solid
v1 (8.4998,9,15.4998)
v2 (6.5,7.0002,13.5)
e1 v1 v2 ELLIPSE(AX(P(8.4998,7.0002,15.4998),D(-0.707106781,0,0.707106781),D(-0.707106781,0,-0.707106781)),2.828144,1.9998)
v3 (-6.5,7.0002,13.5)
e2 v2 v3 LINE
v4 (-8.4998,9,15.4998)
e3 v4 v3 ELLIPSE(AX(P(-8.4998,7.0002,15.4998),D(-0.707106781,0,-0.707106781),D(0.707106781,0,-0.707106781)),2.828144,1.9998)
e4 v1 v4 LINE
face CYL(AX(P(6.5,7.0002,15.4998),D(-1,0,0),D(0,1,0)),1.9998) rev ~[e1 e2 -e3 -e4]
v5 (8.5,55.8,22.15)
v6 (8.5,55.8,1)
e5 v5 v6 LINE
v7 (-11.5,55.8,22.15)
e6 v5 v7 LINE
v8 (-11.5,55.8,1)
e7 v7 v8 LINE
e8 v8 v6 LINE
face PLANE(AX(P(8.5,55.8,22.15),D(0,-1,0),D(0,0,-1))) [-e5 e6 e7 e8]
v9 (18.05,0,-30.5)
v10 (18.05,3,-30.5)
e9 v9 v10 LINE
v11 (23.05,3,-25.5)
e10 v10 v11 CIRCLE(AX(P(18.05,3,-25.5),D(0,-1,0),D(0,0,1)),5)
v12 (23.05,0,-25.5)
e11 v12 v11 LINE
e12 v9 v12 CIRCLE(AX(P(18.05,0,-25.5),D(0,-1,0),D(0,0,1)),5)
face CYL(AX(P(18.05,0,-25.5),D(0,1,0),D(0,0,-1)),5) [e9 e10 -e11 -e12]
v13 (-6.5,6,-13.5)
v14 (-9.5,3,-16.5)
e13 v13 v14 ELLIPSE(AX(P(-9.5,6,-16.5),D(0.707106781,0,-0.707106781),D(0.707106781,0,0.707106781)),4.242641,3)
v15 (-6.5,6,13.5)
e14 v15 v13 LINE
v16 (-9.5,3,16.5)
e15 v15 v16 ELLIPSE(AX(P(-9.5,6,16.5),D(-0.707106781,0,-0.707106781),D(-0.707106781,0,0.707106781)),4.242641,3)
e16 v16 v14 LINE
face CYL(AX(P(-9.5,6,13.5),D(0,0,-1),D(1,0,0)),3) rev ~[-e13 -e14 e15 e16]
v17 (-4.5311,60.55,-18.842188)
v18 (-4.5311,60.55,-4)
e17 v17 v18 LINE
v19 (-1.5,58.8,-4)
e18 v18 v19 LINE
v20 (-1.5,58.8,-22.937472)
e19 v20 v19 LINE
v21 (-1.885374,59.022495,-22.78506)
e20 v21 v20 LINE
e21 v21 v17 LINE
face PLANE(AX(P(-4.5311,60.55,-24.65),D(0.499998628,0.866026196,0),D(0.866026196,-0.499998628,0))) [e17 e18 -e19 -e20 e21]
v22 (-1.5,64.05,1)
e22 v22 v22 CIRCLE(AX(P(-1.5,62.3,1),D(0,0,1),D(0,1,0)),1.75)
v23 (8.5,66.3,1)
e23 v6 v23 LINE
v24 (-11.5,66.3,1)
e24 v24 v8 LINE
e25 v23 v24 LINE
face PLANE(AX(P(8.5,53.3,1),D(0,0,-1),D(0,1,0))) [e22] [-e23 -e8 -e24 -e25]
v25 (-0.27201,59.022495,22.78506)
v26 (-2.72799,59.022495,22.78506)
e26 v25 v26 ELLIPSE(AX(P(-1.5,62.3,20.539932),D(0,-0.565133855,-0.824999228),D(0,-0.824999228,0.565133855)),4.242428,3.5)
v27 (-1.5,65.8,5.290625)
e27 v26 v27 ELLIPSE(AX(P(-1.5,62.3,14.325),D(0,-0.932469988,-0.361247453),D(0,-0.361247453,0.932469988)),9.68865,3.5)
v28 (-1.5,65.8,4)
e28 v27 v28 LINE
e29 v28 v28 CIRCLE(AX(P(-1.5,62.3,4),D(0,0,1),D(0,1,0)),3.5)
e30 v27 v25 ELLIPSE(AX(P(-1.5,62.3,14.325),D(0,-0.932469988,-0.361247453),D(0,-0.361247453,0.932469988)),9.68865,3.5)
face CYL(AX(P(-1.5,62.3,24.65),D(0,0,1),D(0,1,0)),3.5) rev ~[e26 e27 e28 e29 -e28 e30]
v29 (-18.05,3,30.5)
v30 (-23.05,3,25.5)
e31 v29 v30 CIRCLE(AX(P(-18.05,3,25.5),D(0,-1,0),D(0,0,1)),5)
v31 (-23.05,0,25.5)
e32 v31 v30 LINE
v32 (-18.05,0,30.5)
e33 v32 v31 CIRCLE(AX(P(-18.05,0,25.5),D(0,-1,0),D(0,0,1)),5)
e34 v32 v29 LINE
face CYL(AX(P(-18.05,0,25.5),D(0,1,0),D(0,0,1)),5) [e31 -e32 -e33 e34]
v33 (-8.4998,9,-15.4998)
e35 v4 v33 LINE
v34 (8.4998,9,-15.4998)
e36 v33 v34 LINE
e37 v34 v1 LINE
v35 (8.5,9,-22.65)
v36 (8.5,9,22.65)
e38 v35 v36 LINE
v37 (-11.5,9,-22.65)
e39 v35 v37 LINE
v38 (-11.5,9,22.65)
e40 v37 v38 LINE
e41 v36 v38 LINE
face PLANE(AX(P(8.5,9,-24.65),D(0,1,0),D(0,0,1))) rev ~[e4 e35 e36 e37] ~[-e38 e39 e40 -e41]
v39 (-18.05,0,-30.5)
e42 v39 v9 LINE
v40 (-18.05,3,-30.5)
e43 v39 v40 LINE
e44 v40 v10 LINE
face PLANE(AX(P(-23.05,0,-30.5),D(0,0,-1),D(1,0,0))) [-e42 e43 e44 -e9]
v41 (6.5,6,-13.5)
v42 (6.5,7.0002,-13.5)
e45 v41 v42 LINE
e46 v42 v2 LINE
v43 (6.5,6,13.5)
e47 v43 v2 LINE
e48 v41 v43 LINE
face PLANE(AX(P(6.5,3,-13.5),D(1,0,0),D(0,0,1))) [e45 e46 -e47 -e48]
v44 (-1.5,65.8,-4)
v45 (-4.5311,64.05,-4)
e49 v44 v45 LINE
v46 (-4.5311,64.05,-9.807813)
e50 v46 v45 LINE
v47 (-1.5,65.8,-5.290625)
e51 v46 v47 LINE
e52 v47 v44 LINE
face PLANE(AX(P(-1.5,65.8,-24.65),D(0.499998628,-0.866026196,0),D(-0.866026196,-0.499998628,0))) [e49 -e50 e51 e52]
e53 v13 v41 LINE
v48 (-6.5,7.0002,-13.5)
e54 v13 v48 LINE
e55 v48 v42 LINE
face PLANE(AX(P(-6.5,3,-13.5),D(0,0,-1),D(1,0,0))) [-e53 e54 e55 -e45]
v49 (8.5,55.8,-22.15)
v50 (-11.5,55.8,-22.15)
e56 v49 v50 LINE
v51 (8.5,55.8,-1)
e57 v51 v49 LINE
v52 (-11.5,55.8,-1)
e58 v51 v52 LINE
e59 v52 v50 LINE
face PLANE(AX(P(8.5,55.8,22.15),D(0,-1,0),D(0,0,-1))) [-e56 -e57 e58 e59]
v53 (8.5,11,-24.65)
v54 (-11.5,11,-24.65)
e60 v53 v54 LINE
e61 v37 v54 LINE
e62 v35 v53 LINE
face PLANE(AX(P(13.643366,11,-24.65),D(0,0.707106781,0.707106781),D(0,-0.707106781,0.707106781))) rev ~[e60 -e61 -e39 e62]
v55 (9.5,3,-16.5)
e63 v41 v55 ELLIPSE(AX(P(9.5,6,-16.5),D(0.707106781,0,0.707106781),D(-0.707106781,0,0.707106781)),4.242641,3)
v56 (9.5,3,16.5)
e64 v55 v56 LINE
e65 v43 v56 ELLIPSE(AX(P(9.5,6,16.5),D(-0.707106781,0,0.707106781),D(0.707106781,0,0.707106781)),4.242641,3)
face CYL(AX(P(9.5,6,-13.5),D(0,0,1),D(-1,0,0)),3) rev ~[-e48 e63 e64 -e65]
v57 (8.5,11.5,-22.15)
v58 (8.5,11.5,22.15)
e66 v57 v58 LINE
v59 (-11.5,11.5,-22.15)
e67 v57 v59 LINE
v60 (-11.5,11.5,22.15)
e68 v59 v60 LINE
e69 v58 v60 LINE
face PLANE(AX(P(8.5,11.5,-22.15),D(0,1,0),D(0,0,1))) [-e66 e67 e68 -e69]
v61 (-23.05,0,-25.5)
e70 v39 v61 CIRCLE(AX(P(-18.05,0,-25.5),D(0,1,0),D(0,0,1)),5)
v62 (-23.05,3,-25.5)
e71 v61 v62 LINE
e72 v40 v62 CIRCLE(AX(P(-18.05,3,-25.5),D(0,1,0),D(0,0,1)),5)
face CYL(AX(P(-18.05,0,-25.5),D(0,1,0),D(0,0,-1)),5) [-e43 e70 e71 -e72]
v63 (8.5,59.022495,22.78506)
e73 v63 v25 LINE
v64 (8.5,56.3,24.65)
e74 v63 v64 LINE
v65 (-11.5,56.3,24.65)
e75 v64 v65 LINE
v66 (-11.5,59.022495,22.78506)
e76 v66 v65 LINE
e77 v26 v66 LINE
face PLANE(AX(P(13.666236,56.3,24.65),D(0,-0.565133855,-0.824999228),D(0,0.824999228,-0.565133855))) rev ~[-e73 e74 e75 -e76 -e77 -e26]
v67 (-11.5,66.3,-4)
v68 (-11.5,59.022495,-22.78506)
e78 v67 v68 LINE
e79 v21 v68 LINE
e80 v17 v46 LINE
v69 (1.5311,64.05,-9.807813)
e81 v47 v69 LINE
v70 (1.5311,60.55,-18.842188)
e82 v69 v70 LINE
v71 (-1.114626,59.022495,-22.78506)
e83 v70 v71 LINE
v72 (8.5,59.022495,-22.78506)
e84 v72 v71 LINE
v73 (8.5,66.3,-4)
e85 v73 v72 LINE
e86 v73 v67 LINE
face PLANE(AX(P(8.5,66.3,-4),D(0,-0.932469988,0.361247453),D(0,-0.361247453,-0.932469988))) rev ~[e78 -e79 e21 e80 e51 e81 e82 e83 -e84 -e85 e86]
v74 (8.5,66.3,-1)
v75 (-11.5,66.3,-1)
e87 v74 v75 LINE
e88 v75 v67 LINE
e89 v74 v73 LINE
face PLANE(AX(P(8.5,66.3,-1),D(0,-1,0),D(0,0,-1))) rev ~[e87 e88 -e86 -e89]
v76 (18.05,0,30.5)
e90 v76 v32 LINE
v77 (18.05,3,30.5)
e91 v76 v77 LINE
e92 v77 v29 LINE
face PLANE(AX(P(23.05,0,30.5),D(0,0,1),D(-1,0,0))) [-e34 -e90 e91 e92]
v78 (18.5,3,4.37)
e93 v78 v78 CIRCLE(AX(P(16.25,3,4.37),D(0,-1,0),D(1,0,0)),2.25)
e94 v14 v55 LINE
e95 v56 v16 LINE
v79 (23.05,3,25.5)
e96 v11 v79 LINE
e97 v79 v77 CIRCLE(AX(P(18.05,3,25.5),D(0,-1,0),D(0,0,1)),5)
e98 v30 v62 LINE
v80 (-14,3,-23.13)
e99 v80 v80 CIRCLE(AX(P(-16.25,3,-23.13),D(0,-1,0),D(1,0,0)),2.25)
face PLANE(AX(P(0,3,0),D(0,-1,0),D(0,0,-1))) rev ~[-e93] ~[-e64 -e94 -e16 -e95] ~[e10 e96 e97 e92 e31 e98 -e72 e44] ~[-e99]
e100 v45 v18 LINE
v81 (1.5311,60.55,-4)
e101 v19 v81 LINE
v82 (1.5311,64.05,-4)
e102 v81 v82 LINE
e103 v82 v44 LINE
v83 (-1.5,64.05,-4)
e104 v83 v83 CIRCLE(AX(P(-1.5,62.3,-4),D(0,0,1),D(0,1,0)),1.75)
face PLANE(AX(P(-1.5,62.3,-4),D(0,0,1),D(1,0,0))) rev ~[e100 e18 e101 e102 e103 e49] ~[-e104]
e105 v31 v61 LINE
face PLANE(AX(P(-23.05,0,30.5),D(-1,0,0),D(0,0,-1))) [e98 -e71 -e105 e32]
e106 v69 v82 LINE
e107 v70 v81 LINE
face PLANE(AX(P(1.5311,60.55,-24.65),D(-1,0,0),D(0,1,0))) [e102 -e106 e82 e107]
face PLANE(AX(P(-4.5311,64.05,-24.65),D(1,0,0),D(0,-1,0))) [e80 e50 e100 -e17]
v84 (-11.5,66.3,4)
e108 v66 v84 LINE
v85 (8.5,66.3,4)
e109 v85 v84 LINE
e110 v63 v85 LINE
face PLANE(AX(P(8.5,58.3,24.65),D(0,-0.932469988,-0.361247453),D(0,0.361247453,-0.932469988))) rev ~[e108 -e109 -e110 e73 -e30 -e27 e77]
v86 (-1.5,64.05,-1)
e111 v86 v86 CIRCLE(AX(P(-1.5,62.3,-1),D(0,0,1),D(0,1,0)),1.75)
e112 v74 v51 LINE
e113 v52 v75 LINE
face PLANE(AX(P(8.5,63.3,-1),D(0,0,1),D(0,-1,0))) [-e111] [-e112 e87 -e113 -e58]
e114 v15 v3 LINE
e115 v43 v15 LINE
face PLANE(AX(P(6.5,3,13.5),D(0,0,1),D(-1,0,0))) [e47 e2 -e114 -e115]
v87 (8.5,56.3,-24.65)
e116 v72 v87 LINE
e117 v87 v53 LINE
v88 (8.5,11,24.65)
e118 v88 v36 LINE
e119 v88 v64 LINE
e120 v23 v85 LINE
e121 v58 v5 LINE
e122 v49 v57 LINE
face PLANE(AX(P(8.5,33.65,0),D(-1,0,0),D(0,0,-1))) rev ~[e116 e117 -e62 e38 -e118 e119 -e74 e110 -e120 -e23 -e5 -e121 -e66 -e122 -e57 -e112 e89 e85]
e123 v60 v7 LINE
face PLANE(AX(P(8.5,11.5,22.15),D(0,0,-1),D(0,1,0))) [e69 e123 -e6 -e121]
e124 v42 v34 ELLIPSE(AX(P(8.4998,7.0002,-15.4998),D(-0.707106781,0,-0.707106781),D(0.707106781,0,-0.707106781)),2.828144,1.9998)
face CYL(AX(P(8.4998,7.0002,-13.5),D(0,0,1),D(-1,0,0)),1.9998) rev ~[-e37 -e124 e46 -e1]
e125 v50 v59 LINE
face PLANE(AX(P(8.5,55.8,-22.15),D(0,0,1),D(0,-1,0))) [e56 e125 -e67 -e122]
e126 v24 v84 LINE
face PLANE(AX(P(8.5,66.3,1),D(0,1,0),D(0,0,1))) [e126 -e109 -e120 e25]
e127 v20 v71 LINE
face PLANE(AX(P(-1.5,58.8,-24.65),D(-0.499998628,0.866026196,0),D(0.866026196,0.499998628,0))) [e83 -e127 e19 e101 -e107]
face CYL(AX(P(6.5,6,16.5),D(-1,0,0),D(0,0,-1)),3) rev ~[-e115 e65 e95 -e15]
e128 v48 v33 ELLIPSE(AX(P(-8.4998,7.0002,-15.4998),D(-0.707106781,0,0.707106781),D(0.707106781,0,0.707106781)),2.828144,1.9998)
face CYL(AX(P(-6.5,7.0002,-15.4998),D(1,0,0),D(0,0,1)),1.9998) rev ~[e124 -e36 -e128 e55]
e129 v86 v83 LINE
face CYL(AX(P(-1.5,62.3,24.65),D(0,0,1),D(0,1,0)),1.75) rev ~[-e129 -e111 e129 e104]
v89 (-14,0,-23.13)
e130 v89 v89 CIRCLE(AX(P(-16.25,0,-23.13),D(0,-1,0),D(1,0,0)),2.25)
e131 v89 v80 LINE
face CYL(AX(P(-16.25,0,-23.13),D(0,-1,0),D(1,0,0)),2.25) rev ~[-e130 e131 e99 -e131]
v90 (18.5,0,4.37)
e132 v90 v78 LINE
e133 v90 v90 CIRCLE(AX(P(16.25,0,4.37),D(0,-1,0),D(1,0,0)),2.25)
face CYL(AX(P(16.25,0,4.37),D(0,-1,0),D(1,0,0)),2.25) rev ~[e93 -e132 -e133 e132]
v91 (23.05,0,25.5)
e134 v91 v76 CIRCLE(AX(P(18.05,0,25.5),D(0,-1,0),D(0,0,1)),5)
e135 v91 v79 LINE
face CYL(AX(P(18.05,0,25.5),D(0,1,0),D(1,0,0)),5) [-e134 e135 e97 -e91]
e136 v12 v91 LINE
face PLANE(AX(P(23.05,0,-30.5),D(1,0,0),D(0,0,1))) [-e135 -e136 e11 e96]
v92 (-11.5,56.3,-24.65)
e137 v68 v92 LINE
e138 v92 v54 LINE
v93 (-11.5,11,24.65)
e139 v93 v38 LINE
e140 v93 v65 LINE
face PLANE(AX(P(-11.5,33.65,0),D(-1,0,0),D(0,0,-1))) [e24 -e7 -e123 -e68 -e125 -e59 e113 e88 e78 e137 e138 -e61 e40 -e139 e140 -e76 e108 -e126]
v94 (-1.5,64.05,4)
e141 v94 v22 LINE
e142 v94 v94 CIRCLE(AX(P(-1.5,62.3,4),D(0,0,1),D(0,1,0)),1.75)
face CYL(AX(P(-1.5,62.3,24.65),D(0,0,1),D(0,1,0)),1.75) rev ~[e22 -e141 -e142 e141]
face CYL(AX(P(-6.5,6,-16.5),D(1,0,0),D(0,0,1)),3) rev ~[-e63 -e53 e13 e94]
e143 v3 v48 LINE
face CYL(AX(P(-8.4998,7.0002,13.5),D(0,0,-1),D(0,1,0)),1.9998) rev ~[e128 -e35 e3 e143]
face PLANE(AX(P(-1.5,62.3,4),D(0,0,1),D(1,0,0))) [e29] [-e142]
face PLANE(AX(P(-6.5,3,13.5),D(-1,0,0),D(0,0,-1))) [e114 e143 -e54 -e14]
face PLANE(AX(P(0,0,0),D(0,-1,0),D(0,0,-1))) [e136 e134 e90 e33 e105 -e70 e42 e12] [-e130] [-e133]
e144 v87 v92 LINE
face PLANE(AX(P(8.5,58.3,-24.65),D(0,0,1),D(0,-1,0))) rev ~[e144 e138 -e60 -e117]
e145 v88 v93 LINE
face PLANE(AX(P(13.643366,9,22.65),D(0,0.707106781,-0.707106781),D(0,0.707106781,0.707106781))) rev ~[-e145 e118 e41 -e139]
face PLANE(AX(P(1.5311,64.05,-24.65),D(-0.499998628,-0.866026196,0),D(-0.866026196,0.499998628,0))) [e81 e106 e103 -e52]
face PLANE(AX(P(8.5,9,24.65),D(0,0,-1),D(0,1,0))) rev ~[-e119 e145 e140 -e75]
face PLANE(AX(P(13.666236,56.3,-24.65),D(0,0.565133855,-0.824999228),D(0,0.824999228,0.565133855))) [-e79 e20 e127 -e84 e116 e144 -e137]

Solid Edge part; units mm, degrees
sketch "Sketch1" plane through (0, 0, 0) normal (0, -1, 0) x (1, 0, 0)
  circle A0 centre (16.25, 4.37) radius 2.25
  circle A1 centre (-16.25, -23.13) radius 2.25
  line L0 (-23.05, -30.5) -> (23.05, -30.5)
  line L1 (23.05, -30.5) -> (23.05, 30.5)
  line L2 (23.05, 30.5) -> (-23.05, 30.5)
  line L3 (-23.05, 30.5) -> (-23.05, -30.5)
  dimension "D1" = 61
  dimension "D2" = 4.5
  dimension "D3" = 27.5
  dimension "D4" = 32.5
  dimension "D5" = 26.13
  dimension "D6" = 6.8
  dimension "D7" = 6.8
extrude "Protrusion1" add sketch "Sketch1" against normal blind 3
fillet "Redondeo_2" radius 5 4 edges at (23.05, 1.5, 30.5) (-23.05, 1.5, 30.5) (23.05, 1.5, -30.5) (-23.05, 1.5, -30.5)
sketch "Sketch2" plane through (0, 3, 0) normal (0, 1, 0) x (-1, 0, 0)
  line L0 (-6.5, 13.5) -> (6.5, 13.5)
  line L1 (6.5, 13.5) -> (6.5, -13.5)
  line L2 (6.5, -13.5) -> (-6.5, -13.5)
  line L3 (-6.5, -13.5) -> (-6.5, 13.5)
extrude "ProtrusiónExtruida_4" add sketch "Sketch2" along normal blind 6
sketch "Sketch3" plane through (8.5, 6, 0) normal (1, 0, 0) x (0, 1, 0)
  line L0 (49.8, -22.15) -> (5.5, -22.15)
  line L1 (5.5, -22.15) -> (5.5, 22.15)
  line L2 (5.5, 22.15) -> (49.8, 22.15)
  line L3 (49.8, 22.15) -> (49.8, -22.15)
  line L4 (52.3, -24.65) -> (3, -24.65)
  line L5 (3, -24.65) -> (3, 24.65)
  line L6 (3, 24.65) -> (52.3, 24.65)
  line L7 (52.3, 24.65) -> (52.3, -24.65)
  dimension "D1" = 2.5
  dimension "D2" = 2.5
  dimension "D3" = 2.5
  dimension "D4" = 44.3
  dimension "D5" = 22.15
extrude "ProtrusiónExtruida_5" add sketch "Sketch3" against normal blind 20
sketch "Sketch4" plane through (8.5, 33.65, 0) normal (1, 0, 0) x (0, 1, 0)
  line L0 (29.65, -1) -> (19.65, -1)
  line L1 (19.65, -1) -> (19.65, 1)
  line L2 (19.65, 1) -> (29.65, 1)
  line L3 (29.65, 1) -> (29.65, -1)
  dimension "D1" = 2
  dimension "D2" = 10
extrude "VaciadoExtruido_1" cut sketch "Sketch4" against normal blind 43.1103
sketch "Sketch5" plane through (8.5, 33.65, 0) normal (1, 0, 0) x (0, 1, 0)
  line L0 (24.65, -24.65) -> (24.65, -1)
  line L1 (24.65, -1) -> (32.65, -1)
  line L2 (32.65, -1) -> (32.65, -4)
  line L3 (32.65, -4) -> (24.65, -24.65)
  line L4 (24.65, 1) -> (32.65, 1)
  line L5 (32.65, 1) -> (32.65, 4)
  line L6 (24.65, 24.65) -> (32.65, 4)
  line L7 (24.65, 24.65) -> (24.65, 1)
  dimension "D1" = 8
  dimension "D2" = 3
extrude "v_20" add sketch "Sketch5" against normal blind 20
sketch "Sketch6" plane through (-1.5, 33.65, 24.65) normal (0, 0, 1) x (0, 1, 0)
  circle A0 centre (28.65, 0) radius 1.75
  dimension "D1" = 10
  dimension "D2" = 4
extrude "VaciadoExtruido_2" cut sketch "Sketch6" against normal blind 71.0094
sketch "Sketch7" plane through (-1.5, 33.65, 24.65) normal (0, 0, 1) x (0, 1, 0)
  circle A0 centre (28.65, 0) radius 3.5
extrude "Cutout1" cut sketch "Sketch7" against normal up to vertex (20.65 mm away)
chamfer "Chaflán_2" distance 2 angle 45 4 edges at (-1.5, 58.3, 24.65) (-1.5, 9, 24.65) (-1.5, 58.3, -24.65) (-1.5, 9, -24.65)
sketch "Sketch8" plane through (-1.5, 33.65, -24.65) normal (0, 0, -1) x (0, -1, 0)
  line L0 (-32.15, 0) -> (-30.4, 3.0311)
  line L1 (-30.4, 3.0311) -> (-26.9, 3.0311)
  line L2 (-26.9, 3.0311) -> (-25.15, 0)
  line L3 (-25.15, 0) -> (-26.9, -3.0311)
  line L4 (-26.9, -3.0311) -> (-30.4, -3.0311)
  line L5 (-30.4, -3.0311) -> (-32.15, 0)
  dimension "D1" = 7
extrude "Cutout2" cut sketch "Sketch8" against normal up to vertex (20.65 mm away)
fillet "Redondeo_3" radius 3 4 edges at (6.5, 3, 0) (0, 3, 13.5) (0, 3, -13.5) (-6.5, 3, 0)
fillet "Redondeo_4" radius 2 4 edges at (0, 9, -13.5) (-6.5, 9, 0) (0, 9, 13.5) (6.5, 9, 0)
